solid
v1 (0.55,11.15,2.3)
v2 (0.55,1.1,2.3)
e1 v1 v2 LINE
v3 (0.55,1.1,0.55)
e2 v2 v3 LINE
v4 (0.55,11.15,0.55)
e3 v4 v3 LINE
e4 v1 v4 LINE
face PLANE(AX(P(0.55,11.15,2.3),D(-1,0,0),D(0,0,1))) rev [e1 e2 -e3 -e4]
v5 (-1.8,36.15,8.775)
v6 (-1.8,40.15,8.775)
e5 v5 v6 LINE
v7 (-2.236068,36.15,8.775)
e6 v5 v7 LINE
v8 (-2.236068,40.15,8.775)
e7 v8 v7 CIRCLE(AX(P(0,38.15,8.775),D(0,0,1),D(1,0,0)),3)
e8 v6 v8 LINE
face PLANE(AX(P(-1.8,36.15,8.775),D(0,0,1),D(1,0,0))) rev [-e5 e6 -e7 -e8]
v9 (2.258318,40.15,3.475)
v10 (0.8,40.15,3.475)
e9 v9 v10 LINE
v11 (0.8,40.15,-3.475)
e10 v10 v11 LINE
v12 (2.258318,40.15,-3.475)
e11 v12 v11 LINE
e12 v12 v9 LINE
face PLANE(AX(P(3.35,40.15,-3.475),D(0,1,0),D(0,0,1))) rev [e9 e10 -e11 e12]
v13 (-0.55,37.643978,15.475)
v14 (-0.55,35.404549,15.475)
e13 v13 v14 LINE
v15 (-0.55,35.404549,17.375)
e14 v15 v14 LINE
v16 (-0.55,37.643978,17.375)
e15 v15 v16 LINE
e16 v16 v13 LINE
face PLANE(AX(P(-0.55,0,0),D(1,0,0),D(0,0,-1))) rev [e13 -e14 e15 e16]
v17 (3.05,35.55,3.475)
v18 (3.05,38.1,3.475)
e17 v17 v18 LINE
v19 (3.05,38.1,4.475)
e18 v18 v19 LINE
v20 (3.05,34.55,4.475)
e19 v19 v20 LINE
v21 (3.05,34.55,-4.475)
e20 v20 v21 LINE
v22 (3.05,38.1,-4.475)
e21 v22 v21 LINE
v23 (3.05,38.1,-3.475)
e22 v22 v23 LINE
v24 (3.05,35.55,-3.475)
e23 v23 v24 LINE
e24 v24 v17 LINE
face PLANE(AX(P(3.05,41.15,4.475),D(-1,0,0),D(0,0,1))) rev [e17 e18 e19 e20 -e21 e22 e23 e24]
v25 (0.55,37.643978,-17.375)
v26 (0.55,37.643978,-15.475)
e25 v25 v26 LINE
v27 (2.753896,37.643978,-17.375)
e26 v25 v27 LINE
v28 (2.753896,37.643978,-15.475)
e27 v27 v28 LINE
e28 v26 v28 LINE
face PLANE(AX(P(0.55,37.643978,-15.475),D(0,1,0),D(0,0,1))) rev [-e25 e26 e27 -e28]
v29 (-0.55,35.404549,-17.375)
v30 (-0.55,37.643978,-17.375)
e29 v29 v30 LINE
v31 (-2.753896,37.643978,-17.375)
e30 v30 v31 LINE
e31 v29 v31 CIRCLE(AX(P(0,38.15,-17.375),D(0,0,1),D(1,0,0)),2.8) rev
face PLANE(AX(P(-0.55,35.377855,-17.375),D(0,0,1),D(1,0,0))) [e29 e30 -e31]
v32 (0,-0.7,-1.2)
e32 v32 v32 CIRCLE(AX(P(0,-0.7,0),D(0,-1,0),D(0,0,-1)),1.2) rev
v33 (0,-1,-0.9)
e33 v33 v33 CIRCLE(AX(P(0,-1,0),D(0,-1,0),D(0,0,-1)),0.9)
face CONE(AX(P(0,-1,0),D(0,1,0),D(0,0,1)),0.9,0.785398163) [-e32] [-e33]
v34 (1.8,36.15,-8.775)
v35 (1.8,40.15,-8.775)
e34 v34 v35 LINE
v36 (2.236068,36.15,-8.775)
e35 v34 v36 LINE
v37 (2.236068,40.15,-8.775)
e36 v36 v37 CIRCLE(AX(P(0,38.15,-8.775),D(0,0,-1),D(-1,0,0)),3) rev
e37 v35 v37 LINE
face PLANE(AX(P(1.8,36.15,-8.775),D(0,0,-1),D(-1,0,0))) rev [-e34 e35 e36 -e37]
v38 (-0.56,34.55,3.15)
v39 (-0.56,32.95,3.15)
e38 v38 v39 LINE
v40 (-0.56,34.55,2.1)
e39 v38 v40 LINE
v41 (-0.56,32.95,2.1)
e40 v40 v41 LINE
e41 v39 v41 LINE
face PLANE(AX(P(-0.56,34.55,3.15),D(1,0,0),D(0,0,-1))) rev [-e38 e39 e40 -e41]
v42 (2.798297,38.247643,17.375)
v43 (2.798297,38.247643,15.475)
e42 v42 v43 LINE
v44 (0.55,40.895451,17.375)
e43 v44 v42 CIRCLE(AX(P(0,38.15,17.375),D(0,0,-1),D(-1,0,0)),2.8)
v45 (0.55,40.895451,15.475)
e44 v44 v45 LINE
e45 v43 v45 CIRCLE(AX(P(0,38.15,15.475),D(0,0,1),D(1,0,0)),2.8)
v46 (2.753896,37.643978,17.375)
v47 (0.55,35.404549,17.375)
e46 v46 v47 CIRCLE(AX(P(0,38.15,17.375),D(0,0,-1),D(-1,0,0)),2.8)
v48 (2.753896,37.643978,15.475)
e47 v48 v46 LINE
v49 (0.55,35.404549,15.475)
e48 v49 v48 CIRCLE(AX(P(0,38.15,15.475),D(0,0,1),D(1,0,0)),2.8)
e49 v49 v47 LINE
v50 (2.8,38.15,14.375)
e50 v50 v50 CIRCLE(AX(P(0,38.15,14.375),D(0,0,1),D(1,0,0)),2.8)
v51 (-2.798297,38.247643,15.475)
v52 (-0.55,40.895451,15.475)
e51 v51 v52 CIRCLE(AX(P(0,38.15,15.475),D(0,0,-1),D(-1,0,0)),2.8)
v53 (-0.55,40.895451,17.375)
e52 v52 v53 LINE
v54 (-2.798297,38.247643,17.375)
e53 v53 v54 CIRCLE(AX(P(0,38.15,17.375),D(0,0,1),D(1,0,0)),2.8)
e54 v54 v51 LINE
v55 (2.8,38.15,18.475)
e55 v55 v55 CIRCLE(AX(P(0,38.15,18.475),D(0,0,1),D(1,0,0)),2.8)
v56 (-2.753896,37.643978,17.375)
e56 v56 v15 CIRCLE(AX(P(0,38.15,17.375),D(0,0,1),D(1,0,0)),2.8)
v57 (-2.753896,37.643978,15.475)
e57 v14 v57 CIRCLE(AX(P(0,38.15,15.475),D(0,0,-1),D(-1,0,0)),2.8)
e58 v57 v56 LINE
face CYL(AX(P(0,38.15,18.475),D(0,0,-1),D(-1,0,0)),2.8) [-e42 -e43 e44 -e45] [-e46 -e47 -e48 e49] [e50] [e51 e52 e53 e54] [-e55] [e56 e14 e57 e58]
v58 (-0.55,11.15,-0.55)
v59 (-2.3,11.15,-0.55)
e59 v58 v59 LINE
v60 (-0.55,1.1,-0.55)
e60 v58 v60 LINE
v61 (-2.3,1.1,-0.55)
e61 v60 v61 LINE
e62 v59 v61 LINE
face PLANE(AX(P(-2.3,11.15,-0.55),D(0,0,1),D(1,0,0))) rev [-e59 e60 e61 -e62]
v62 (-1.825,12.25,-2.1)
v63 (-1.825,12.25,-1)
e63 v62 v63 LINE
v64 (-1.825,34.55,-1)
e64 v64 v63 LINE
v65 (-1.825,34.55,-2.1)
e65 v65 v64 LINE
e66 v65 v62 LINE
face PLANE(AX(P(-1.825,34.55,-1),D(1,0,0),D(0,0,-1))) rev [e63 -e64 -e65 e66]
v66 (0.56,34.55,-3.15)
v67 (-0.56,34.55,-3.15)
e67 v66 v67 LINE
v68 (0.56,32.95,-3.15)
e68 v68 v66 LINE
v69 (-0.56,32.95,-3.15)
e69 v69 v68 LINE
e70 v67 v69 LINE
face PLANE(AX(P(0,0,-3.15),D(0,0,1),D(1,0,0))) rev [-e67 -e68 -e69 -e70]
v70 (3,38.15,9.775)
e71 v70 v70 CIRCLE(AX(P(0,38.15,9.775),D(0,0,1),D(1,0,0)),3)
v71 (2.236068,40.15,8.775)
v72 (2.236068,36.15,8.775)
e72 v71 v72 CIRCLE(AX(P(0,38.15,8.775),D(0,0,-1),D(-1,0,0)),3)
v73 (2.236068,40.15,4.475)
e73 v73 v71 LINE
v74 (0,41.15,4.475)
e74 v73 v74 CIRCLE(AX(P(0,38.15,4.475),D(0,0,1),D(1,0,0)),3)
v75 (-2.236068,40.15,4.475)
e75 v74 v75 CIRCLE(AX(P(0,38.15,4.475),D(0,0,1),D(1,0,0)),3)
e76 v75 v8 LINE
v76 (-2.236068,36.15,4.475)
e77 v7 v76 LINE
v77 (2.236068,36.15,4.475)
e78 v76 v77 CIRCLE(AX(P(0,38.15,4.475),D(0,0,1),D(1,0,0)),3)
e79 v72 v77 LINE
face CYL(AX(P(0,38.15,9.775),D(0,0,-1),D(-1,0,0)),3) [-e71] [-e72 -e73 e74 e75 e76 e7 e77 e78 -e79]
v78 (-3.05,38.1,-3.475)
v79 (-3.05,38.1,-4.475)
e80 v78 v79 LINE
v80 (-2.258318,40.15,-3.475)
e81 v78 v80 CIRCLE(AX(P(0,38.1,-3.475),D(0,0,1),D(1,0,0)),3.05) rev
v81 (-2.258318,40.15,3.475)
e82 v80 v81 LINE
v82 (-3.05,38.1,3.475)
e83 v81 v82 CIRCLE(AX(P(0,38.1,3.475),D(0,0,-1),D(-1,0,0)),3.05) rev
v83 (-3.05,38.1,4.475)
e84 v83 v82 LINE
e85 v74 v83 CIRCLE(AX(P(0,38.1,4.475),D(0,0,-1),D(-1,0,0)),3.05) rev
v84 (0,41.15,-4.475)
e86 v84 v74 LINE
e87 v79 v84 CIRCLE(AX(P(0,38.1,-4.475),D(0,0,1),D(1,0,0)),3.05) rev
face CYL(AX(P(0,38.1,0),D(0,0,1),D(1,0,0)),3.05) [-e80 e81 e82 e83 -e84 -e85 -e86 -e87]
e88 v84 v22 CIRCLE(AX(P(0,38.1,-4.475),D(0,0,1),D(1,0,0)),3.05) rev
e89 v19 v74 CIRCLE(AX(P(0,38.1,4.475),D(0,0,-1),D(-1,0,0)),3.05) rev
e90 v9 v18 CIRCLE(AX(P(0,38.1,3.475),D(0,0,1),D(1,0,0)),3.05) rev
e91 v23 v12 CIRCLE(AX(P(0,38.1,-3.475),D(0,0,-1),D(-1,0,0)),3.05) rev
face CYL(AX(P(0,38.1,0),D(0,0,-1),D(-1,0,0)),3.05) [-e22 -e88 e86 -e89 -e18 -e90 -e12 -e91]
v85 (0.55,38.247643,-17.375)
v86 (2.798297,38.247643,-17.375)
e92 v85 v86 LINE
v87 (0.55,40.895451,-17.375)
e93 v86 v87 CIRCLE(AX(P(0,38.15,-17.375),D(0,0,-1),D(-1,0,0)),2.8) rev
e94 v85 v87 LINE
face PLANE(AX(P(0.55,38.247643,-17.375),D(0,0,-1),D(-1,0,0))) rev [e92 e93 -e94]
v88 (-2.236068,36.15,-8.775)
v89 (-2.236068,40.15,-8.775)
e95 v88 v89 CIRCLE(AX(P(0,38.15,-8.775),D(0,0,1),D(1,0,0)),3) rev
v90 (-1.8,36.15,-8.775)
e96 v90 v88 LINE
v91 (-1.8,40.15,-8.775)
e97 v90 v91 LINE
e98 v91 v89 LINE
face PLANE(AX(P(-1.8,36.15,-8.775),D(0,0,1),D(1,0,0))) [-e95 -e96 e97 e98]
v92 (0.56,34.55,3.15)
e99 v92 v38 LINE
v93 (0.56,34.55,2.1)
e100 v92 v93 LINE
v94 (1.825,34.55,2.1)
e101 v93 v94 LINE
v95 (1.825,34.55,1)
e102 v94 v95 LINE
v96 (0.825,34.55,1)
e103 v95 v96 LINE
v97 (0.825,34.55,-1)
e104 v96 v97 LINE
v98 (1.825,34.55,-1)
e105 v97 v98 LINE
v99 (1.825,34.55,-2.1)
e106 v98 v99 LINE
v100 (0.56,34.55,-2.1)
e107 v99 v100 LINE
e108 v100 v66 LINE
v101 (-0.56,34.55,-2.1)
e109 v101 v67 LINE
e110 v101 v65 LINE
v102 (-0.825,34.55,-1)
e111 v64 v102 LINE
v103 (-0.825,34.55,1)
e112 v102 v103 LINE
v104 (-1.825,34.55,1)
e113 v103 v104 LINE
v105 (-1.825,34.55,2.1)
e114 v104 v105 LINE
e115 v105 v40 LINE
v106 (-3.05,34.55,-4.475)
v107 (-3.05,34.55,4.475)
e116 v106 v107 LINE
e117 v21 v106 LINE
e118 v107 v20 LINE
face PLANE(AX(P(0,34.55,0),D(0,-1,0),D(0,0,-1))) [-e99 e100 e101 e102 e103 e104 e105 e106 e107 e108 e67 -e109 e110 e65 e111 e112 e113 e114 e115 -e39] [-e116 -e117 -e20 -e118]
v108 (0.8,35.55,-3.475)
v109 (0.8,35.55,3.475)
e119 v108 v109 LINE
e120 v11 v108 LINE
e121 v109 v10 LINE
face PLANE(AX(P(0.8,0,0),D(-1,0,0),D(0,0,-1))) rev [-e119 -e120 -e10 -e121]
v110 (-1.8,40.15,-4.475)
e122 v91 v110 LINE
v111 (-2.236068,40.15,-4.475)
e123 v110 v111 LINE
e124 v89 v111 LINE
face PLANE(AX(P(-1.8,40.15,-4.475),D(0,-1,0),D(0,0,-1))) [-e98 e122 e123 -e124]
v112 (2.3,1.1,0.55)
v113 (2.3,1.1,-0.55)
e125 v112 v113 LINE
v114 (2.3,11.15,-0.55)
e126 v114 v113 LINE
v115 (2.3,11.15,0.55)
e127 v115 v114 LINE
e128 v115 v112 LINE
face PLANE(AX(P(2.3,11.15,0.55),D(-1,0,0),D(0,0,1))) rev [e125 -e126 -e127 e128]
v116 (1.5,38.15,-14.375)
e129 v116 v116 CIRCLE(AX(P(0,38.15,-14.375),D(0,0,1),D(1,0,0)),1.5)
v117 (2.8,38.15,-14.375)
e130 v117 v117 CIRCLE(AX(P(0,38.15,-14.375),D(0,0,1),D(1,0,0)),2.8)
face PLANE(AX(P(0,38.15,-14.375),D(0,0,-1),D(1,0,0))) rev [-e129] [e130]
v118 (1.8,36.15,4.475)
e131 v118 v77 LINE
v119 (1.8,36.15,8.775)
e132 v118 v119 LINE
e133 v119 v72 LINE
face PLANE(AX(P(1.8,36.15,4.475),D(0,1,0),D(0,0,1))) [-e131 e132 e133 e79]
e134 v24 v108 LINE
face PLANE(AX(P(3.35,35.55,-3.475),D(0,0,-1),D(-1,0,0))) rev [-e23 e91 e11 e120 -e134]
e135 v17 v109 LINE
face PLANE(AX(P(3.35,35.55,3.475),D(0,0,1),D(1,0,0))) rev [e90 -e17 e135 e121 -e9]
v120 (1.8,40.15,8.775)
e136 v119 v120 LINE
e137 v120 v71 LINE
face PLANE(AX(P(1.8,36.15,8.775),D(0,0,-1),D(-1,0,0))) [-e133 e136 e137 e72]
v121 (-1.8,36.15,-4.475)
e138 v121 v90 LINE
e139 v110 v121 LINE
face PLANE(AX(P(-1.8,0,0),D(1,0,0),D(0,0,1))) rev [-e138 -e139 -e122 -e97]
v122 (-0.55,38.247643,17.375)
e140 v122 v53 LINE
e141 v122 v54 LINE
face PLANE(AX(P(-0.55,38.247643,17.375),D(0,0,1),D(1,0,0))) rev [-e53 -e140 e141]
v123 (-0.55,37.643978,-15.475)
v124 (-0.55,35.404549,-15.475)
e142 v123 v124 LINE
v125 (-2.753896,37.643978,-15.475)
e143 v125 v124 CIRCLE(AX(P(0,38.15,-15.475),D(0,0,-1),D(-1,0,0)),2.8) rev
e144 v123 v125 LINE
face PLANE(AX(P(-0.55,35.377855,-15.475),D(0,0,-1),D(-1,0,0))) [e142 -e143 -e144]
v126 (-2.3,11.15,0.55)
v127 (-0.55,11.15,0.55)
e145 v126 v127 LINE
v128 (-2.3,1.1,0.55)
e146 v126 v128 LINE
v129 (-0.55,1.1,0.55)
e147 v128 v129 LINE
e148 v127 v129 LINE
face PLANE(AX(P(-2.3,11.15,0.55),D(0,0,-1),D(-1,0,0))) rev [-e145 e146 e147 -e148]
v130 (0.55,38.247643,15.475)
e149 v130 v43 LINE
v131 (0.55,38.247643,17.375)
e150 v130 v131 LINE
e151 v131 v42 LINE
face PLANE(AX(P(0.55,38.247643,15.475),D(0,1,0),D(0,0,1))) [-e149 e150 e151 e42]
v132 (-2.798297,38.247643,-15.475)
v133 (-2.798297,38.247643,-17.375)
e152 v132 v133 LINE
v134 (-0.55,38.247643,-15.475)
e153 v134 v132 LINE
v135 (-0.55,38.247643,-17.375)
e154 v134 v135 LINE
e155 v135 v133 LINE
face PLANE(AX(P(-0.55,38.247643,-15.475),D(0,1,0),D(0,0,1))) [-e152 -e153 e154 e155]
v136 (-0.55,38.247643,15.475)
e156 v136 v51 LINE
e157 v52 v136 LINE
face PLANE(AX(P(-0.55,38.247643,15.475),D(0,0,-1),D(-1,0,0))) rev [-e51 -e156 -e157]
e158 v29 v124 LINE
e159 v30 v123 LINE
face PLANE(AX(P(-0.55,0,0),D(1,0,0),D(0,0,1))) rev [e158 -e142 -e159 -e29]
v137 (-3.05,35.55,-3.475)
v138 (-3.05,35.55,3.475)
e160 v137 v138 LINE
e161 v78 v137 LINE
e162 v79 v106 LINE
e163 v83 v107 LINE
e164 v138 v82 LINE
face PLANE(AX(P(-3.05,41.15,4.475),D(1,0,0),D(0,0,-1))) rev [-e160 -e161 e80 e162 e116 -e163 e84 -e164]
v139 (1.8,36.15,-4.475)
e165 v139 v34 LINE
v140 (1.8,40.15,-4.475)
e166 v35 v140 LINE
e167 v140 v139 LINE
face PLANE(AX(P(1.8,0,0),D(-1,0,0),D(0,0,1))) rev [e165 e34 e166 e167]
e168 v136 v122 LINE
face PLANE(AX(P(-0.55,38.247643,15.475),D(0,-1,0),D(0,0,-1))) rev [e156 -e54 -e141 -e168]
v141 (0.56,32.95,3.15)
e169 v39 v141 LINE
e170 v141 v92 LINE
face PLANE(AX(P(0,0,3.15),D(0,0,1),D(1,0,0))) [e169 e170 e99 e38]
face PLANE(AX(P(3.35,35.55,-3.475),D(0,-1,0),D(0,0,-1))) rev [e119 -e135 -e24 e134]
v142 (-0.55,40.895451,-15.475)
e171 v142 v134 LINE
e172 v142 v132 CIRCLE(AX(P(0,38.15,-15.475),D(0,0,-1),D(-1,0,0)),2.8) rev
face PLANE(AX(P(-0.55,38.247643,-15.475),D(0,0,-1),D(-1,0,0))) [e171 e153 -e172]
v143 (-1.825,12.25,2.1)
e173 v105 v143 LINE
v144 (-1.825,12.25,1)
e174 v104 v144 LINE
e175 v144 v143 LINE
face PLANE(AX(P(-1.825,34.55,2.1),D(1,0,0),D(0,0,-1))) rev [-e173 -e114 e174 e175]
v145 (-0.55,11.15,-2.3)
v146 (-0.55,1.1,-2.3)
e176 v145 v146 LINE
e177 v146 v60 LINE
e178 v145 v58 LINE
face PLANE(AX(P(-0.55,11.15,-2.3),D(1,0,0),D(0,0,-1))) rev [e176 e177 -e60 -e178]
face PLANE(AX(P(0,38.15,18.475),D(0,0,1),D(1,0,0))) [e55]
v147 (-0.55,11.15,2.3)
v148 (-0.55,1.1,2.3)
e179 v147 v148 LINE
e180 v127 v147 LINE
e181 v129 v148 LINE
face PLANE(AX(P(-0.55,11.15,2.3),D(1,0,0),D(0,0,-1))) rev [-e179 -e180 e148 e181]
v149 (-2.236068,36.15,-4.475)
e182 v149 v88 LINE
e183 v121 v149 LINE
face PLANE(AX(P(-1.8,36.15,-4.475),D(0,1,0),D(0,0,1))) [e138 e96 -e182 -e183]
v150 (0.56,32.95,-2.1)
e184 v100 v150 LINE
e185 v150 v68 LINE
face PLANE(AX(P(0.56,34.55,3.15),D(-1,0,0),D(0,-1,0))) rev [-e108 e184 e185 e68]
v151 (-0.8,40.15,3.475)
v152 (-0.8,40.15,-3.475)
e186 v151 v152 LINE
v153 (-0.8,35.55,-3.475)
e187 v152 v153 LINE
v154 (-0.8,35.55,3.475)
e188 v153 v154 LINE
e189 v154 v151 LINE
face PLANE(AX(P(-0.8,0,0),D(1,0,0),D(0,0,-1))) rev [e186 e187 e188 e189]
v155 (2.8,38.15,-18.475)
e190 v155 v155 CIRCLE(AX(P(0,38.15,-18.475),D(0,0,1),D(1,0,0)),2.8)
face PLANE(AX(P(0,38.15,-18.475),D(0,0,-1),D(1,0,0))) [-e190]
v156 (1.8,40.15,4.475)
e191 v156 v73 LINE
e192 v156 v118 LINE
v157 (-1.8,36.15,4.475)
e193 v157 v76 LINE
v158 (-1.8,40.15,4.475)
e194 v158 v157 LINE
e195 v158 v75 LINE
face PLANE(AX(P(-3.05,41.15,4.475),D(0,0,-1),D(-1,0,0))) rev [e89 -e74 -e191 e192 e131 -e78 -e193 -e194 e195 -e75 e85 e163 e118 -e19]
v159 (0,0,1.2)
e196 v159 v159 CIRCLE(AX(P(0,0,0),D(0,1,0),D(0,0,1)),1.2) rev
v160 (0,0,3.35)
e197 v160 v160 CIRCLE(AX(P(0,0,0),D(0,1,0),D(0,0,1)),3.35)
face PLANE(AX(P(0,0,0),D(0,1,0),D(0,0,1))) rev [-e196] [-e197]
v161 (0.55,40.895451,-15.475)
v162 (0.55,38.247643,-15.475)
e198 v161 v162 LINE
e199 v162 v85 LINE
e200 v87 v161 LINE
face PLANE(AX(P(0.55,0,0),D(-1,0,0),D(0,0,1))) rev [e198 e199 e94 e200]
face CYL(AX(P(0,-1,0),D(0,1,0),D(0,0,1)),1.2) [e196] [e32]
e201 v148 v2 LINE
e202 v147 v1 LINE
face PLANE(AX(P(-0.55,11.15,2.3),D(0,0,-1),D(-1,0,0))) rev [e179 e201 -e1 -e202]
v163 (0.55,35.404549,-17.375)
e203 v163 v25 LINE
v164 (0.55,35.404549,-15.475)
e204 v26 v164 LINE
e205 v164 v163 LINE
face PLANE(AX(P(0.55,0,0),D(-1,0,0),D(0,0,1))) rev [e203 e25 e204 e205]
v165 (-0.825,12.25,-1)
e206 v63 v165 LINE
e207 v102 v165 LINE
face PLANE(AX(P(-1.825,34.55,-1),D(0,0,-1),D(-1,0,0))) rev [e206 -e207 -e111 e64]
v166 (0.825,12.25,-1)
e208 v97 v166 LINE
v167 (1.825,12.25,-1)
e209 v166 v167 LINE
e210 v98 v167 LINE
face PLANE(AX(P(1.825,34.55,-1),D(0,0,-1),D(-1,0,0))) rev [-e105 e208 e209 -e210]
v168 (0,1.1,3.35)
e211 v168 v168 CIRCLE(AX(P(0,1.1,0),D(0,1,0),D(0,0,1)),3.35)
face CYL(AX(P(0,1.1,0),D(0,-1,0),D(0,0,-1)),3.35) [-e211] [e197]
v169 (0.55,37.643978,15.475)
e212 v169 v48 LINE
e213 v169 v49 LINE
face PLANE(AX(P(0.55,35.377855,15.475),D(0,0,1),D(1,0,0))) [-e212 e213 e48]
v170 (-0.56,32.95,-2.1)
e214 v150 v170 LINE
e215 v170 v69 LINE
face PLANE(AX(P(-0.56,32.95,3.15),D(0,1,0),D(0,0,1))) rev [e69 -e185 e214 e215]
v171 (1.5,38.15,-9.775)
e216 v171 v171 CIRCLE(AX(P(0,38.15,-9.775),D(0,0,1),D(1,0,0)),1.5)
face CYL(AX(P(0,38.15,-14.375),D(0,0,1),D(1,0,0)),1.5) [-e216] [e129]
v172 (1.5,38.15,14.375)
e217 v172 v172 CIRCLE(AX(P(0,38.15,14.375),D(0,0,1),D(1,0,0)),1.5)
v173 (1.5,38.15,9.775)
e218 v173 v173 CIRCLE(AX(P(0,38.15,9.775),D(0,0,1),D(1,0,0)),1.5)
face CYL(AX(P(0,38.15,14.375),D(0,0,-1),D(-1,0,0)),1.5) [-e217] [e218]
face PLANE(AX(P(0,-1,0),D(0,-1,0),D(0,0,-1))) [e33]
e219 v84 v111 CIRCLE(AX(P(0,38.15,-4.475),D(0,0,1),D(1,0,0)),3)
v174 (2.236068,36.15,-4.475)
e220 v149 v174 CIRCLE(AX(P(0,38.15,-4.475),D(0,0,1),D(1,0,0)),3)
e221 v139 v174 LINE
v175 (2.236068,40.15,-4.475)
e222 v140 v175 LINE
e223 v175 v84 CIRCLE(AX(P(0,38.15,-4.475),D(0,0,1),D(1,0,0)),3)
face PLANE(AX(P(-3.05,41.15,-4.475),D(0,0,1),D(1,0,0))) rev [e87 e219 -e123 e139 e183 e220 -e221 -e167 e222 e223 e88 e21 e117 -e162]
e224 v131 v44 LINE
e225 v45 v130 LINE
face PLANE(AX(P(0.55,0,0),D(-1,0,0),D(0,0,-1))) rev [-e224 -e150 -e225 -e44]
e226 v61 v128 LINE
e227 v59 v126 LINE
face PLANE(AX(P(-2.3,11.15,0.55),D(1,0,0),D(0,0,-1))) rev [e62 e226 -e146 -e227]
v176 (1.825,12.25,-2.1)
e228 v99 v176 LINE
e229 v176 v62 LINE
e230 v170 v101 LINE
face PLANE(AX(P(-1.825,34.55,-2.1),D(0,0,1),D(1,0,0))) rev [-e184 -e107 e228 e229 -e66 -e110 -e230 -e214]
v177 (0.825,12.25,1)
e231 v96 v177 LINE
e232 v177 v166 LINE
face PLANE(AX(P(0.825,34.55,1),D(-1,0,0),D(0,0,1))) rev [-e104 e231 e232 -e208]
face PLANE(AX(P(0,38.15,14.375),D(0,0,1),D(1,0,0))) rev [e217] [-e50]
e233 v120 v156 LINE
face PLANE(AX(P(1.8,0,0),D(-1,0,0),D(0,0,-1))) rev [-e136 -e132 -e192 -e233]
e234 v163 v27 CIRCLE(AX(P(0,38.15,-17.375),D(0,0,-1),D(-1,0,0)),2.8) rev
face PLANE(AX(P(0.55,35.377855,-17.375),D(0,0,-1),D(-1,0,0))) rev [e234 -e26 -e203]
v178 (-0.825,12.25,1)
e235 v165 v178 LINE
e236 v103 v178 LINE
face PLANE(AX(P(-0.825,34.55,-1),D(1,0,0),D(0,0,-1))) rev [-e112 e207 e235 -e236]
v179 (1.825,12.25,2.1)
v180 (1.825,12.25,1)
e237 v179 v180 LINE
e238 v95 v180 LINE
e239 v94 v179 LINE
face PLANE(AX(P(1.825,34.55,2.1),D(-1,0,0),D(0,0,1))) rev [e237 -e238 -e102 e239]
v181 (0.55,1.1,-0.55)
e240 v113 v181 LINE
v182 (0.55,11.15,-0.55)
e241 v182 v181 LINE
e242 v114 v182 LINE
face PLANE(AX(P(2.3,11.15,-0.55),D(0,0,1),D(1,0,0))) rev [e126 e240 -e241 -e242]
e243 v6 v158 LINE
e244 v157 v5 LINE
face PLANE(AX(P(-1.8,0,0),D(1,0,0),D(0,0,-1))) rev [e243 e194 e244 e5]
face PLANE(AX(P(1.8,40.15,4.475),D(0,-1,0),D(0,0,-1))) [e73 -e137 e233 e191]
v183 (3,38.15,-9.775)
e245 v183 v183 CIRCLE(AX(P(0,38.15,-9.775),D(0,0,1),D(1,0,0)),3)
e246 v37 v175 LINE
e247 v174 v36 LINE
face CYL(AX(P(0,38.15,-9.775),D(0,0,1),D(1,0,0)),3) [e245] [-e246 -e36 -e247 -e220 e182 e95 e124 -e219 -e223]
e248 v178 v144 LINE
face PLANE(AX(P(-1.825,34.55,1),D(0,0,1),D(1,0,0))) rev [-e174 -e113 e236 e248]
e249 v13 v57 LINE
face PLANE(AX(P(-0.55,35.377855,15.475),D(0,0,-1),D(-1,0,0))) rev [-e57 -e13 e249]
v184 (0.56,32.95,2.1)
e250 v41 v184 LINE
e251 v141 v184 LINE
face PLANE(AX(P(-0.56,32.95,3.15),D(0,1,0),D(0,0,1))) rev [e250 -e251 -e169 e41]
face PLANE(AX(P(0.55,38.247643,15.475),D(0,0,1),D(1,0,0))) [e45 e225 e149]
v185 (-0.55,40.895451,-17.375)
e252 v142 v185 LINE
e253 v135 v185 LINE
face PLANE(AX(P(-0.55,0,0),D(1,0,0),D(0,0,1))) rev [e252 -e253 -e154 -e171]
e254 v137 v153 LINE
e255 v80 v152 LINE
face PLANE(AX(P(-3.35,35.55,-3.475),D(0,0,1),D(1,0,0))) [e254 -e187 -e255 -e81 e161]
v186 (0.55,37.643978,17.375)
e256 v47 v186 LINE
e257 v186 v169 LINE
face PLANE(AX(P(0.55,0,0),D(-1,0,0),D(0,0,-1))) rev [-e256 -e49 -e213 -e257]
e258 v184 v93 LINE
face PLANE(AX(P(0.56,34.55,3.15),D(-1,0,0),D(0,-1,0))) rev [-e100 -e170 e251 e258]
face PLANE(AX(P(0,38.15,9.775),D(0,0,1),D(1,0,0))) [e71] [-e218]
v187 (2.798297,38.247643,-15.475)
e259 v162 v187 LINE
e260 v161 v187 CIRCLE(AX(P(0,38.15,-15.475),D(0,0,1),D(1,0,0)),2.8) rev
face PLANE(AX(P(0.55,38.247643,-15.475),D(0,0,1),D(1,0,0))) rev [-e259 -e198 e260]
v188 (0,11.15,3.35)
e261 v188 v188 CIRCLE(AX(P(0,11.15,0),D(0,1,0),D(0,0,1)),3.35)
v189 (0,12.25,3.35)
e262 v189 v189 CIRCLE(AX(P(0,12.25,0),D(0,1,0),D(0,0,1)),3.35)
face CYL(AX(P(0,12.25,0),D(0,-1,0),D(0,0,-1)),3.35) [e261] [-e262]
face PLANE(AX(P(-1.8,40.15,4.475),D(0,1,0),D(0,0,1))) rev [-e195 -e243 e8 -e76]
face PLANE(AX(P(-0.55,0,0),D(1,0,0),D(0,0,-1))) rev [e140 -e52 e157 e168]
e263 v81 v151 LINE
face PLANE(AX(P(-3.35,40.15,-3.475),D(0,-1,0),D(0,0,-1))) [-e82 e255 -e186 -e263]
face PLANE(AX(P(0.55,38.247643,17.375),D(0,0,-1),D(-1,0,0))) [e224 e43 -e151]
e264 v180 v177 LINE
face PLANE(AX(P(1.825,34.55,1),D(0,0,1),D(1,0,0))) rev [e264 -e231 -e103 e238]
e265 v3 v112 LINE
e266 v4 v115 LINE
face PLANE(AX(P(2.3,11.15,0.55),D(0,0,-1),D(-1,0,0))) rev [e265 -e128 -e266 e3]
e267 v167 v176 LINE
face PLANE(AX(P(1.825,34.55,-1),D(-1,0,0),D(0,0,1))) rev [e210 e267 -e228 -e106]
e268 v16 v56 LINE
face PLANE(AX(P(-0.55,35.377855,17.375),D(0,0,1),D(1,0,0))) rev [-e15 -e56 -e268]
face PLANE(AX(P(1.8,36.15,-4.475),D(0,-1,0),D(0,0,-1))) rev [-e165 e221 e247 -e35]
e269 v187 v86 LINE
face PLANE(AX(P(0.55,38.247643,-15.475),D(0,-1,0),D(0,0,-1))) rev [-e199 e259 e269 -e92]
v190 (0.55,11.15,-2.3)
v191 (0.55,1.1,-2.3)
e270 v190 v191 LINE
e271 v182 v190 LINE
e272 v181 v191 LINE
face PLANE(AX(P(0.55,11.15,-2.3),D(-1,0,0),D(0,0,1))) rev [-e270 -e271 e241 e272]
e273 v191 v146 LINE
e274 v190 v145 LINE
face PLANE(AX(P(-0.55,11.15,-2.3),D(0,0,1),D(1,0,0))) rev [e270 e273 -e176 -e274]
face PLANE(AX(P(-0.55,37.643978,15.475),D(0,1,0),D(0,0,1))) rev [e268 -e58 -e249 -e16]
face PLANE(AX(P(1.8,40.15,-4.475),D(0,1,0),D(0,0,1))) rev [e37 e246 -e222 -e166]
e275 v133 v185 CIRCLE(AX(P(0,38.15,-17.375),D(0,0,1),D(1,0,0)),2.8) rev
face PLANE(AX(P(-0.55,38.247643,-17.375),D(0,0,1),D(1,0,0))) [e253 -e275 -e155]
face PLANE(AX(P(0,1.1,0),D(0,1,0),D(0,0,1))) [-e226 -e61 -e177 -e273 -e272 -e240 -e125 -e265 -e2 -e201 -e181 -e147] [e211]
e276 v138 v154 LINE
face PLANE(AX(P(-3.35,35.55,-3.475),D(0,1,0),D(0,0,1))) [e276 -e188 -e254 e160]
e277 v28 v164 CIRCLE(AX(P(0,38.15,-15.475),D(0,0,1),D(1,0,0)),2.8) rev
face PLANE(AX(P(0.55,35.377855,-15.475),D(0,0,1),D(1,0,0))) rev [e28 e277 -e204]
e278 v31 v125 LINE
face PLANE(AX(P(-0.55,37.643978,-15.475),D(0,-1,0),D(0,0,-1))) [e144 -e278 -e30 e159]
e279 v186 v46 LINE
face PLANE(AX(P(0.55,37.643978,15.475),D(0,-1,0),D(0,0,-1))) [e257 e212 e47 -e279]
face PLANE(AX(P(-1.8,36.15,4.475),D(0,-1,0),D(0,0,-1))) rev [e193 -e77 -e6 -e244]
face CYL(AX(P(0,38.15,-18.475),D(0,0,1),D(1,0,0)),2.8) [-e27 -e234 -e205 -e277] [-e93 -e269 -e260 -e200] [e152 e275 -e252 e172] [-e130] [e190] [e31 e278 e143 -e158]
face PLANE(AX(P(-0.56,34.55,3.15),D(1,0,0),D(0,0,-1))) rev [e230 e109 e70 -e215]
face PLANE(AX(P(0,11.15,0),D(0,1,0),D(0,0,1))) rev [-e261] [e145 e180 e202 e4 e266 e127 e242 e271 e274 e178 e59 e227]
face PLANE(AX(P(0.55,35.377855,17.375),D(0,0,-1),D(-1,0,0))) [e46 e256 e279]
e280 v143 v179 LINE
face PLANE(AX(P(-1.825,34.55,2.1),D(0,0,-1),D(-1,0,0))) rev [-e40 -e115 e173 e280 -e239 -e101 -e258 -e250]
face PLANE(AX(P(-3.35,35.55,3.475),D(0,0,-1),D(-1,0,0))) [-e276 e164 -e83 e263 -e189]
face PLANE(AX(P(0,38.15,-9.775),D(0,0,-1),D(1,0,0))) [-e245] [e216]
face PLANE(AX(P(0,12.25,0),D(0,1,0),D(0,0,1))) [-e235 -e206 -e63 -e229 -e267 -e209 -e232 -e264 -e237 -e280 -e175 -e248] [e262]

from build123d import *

# Parameters (mm, degrees)
SKETCH1_R                 = 3.35
BOSS_EXTRUDE1_DEPTH       = 1.1
BOSS_EXTRUDE2_DEPTH       = 10.05
SKETCH3_R                 = 3.35
BOSS_EXTRUDE3_DEPTH       = 1.1
BOSS_EXTRUDE4_DEPTH       = 22.3
SKETCH6_W                 = 6.1
SKETCH6_H                 = 8.95
BOSS_EXTRUDE5_DEPTH       = 6.6
SKETCH7_R                 = 3
BOSS_EXTRUDE6_DEPTH       = 5.3
SKETCH8_R                 = 1.5
BOSS_EXTRUDE7_DEPTH       = 4.6
SKETCH9_R                 = 2.8
BOSS_EXTRUDE8_DEPTH       = 4.1
FILLET2_R                 = 3.05
CUT_EXTRUDE1_START        = -2.25
SKETCH10_W                = 6.95
SKETCH10_H                = 4.6
CUT_EXTRUDE1_DEPTH        = 48.808842446
SKETCH11_W                = 4.3
SKETCH11_H                = 4
CUT_EXTRUDE2_DEPTH        = 1.25
SKETCH12_W                = 1.9
SKETCH12_H                = 2.702356958
SKETCH12_H_2              = 2.266123784
CUT_EXTRUDE3_DEPTH        = 2.5
MIRROR3_START             = -2.25
MIRROR3_COPY_1_SKETCH_W   = 6.95
MIRROR3_COPY_1_SKETCH_H   = 4.6
MIRROR3_COPY_1_DEPTH      = 48.808842446
MIRROR3_COPY_2_SKETCH_W   = 4.3
MIRROR3_COPY_2_SKETCH_H   = 4
MIRROR3_COPY_2_DEPTH      = 1.25
MIRROR3_COPY_3_SKETCH_W   = 1.9
MIRROR3_COPY_3_SKETCH_H   = 2.702356958
MIRROR3_COPY_3_SKETCH_H_2 = 2.266123784
MIRROR3_COPY_3_DEPTH      = 2.5
MIRROR3_COPY_4_SKETCH_W   = 6.95
MIRROR3_COPY_4_SKETCH_H   = 4.6
MIRROR3_COPY_4_DEPTH      = 48.808842446
SKETCH13_W                = 1.12
SKETCH13_H                = 1.6
BOSS_EXTRUDE9_DEPTH       = 3.15
SKETCH14_R                = 1.05
BOSS_EXTRUDE10_DEPTH      = 0.5
SKETCH15_R                = 1.2
BOSS_EXTRUDE11_DEPTH      = 0.5
CHAMFER1_SIZE             = 0.3


with BuildPart() as part:
    # Sketch1 → Boss-Extrude1 (new body)
    with BuildSketch(Plane(origin=(0, 0, 0), x_dir=(1, 0, 0), z_dir=(0, 1, 0))):
        with Locations(Location((0, 0, 0), (0, 0, 270))):
            Circle(SKETCH1_R)
    extrude(amount=BOSS_EXTRUDE1_DEPTH)

    # Sketch2 → Boss-Extrude2 (add)
    with BuildSketch(Plane(origin=(0, 1.1, 0), x_dir=(1, 0, 0), z_dir=(0, 1, 0))):
        Polygon((-0.55, -2.3), (0.55, -2.3), (0.55, -0.55), (2.3, -0.55), (2.3, 0.55), (0.55, 0.55), (0.55, 2.3), (-0.55, 2.3), (-0.55, 0.55), (-2.3, 0.55), (-2.3, -0.55), (-0.55, -0.55), align=None)
    extrude(amount=BOSS_EXTRUDE2_DEPTH)

    # Sketch3 → Boss-Extrude3 (add)
    with BuildSketch(Plane(origin=(0, 11.15, 0), x_dir=(1, 0, 0), z_dir=(0, 1, 0))):
        with Locations(Location((0, 0, 0), (0, 0, 270))):
            Circle(SKETCH3_R)
    extrude(amount=BOSS_EXTRUDE3_DEPTH)

    # Sketch5 → Boss-Extrude4 (add)
    with BuildSketch(Plane(origin=(0, 12.25, 0), x_dir=(1, 0, 0), z_dir=(0, 1, 0))):
        Polygon((-1.825, 1), (-1.825, 2.1), (1.825, 2.1), (1.825, 1), (0.825, 1), (0.825, -1), (1.825, -1), (1.825, -2.1), (-1.825, -2.1), (-1.825, -1), (-0.825, -1), (-0.825, 1), align=None)
    extrude(amount=BOSS_EXTRUDE4_DEPTH)

    # Sketch6 → Boss-Extrude5 (add)
    with BuildSketch(Plane(origin=(0, 34.55, 0), x_dir=(1, 0, 0), z_dir=(0, 1, 0))):
        Rectangle(SKETCH6_W, SKETCH6_H)
    extrude(amount=BOSS_EXTRUDE5_DEPTH)

    # Sketch7 → Boss-Extrude6 (add)
    with BuildSketch(Plane.XY.offset(4.475)):
        with Locations(Location((0, 38.15, 0), (0, 0, 90))):
            Circle(SKETCH7_R)
    boss_extrude6 = extrude(amount=BOSS_EXTRUDE6_DEPTH)

    # Sketch8 → Boss-Extrude7 (add)
    with BuildSketch(Plane.XY.offset(9.775)):
        with Locations((0, 38.15)):
            Circle(SKETCH8_R)
    boss_extrude7 = extrude(amount=BOSS_EXTRUDE7_DEPTH)

    # Sketch9 → Boss-Extrude8 (add)
    with BuildSketch(Plane.XY.offset(14.375)):
        with Locations((0, 38.15)):
            Circle(SKETCH9_R)
    boss_extrude8 = extrude(amount=BOSS_EXTRUDE8_DEPTH)

    # Fillet2
    fillet2_edges = [part.edges().sort_by_distance(p)[0] for p in [
        (3.05, 41.15, 0),
        (-3.05, 41.15, 0),
    ]]
    fillet(fillet2_edges, radius=FILLET2_R - 0.0001)  # a hair under: the kernel refuses the full size

    # Sketch10 → Cut-Extrude1 (cut)
    with BuildSketch(Plane.ZY.offset(3.05).offset(CUT_EXTRUDE1_START)):
        with Locations((0, 37.85)):
            Rectangle(SKETCH10_W, SKETCH10_H)
    cut_extrude1 = extrude(amount=CUT_EXTRUDE1_DEPTH, mode=Mode.SUBTRACT)

    # Sketch11 → Cut-Extrude2 (cut)
    with BuildSketch(Plane.ZY.offset(3.05)):
        with Locations((6.625, 38.15)):
            Rectangle(SKETCH11_W, SKETCH11_H)
    cut_extrude2 = extrude(amount=-CUT_EXTRUDE2_DEPTH, mode=Mode.SUBTRACT)

    # Sketch12 → Cut-Extrude3 (cut)
    with BuildSketch(Plane.ZY.offset(3.05)):
        with Locations((16.425, 39.598821521)):
            Rectangle(SKETCH12_W, SKETCH12_H)
        with Locations((16.425, 36.510916585)):
            Rectangle(SKETCH12_W, SKETCH12_H_2)
    cut_extrude3 = extrude(amount=-CUT_EXTRUDE3_DEPTH, mode=Mode.SUBTRACT)

    # Mirror1: Cut-Extrude1, Cut-Extrude2, Cut-Extrude3 across plane
    add(cut_extrude1.mirror(Plane(origin=(0, 0, 0), x_dir=(0, 0, 1), z_dir=(1, 0, 0))), mode=Mode.SUBTRACT)
    add(cut_extrude2.mirror(Plane(origin=(0, 0, 0), x_dir=(0, 0, 1), z_dir=(1, 0, 0))), mode=Mode.SUBTRACT)
    add(cut_extrude3.mirror(Plane(origin=(0, 0, 0), x_dir=(0, 0, 1), z_dir=(1, 0, 0))), mode=Mode.SUBTRACT)

    # Mirror3: Boss-Extrude6, Boss-Extrude7, Boss-Extrude8, Cut-Extrude2, Cut-Extrude3 across plane
    add(boss_extrude6.mirror(Plane.XY))
    add(boss_extrude7.mirror(Plane.XY))
    add(boss_extrude8.mirror(Plane.XY))
    add(cut_extrude2.mirror(Plane.XY), mode=Mode.SUBTRACT)
    add(cut_extrude3.mirror(Plane.XY), mode=Mode.SUBTRACT)

    # Mirror3 copy 1 sketch → Mirror3 copy 1 (cut)
    with BuildSketch(Plane(origin=(3.05, 0, 0), x_dir=(0, 0, -1), z_dir=(1, 0, 0)).offset(MIRROR3_START)):
        with Locations((0, 37.85)):
            Rectangle(MIRROR3_COPY_1_SKETCH_W, MIRROR3_COPY_1_SKETCH_H)
    extrude(amount=MIRROR3_COPY_1_DEPTH, mode=Mode.SUBTRACT)

    # Mirror3 copy 2 sketch → Mirror3 copy 2 (cut)
    with BuildSketch(Plane(origin=(3.05, 0, 0), x_dir=(0, 0, -1), z_dir=(1, 0, 0))):
        with Locations((6.625, 38.15)):
            Rectangle(MIRROR3_COPY_2_SKETCH_W, MIRROR3_COPY_2_SKETCH_H)
    extrude(amount=-MIRROR3_COPY_2_DEPTH, mode=Mode.SUBTRACT)

    # Mirror3 copy 3 sketch → Mirror3 copy 3 (cut)
    with BuildSketch(Plane(origin=(3.05, 0, 0), x_dir=(0, 0, -1), z_dir=(1, 0, 0))):
        with Locations((16.425, 39.598821521)):
            Rectangle(MIRROR3_COPY_3_SKETCH_W, MIRROR3_COPY_3_SKETCH_H)
        with Locations((16.425, 36.510916585)):
            Rectangle(MIRROR3_COPY_3_SKETCH_W, MIRROR3_COPY_3_SKETCH_H_2)
    extrude(amount=-MIRROR3_COPY_3_DEPTH, mode=Mode.SUBTRACT)

    # Mirror3 copy 4 sketch → Mirror3 copy 4 (cut)
    with BuildSketch(Plane(origin=(-3.05, 0, 0), x_dir=(0, 0, -1), z_dir=(-1, 0, 0)).offset(MIRROR3_START)):
        with Locations((0, -37.85)):
            Rectangle(MIRROR3_COPY_4_SKETCH_W, MIRROR3_COPY_4_SKETCH_H)
    extrude(amount=MIRROR3_COPY_4_DEPTH, mode=Mode.SUBTRACT)

    # Sketch13 → Boss-Extrude9 (add, symmetric)
    with BuildSketch(Plane.XY):
        with Locations((0, 33.75)):
            Rectangle(SKETCH13_W, SKETCH13_H)
    extrude(amount=BOSS_EXTRUDE9_DEPTH, both=True)

    # Sketch14 → Boss-Extrude10 (add, symmetric)
    with BuildSketch(Plane.XZ):
        with Locations(Location((0, 0, 0), (0, 0, 90))):
            Circle(SKETCH14_R)
    extrude(amount=BOSS_EXTRUDE10_DEPTH, both=True)

    # Sketch15 → Boss-Extrude11 (add, symmetric)
    with BuildSketch(Plane.XZ.offset(0.5)):
        with Locations(Location((0, 0, 0), (0, 0, 90))):
            Circle(SKETCH15_R)
    extrude(amount=BOSS_EXTRUDE11_DEPTH, both=True)

    # Chamfer1
    chamfer1_edges = [part.edges().sort_by_distance(p)[0] for p in [
        (0, -1, -1.2),
    ]]
    chamfer(chamfer1_edges, length=CHAMFER1_SIZE)


solid = part.part
